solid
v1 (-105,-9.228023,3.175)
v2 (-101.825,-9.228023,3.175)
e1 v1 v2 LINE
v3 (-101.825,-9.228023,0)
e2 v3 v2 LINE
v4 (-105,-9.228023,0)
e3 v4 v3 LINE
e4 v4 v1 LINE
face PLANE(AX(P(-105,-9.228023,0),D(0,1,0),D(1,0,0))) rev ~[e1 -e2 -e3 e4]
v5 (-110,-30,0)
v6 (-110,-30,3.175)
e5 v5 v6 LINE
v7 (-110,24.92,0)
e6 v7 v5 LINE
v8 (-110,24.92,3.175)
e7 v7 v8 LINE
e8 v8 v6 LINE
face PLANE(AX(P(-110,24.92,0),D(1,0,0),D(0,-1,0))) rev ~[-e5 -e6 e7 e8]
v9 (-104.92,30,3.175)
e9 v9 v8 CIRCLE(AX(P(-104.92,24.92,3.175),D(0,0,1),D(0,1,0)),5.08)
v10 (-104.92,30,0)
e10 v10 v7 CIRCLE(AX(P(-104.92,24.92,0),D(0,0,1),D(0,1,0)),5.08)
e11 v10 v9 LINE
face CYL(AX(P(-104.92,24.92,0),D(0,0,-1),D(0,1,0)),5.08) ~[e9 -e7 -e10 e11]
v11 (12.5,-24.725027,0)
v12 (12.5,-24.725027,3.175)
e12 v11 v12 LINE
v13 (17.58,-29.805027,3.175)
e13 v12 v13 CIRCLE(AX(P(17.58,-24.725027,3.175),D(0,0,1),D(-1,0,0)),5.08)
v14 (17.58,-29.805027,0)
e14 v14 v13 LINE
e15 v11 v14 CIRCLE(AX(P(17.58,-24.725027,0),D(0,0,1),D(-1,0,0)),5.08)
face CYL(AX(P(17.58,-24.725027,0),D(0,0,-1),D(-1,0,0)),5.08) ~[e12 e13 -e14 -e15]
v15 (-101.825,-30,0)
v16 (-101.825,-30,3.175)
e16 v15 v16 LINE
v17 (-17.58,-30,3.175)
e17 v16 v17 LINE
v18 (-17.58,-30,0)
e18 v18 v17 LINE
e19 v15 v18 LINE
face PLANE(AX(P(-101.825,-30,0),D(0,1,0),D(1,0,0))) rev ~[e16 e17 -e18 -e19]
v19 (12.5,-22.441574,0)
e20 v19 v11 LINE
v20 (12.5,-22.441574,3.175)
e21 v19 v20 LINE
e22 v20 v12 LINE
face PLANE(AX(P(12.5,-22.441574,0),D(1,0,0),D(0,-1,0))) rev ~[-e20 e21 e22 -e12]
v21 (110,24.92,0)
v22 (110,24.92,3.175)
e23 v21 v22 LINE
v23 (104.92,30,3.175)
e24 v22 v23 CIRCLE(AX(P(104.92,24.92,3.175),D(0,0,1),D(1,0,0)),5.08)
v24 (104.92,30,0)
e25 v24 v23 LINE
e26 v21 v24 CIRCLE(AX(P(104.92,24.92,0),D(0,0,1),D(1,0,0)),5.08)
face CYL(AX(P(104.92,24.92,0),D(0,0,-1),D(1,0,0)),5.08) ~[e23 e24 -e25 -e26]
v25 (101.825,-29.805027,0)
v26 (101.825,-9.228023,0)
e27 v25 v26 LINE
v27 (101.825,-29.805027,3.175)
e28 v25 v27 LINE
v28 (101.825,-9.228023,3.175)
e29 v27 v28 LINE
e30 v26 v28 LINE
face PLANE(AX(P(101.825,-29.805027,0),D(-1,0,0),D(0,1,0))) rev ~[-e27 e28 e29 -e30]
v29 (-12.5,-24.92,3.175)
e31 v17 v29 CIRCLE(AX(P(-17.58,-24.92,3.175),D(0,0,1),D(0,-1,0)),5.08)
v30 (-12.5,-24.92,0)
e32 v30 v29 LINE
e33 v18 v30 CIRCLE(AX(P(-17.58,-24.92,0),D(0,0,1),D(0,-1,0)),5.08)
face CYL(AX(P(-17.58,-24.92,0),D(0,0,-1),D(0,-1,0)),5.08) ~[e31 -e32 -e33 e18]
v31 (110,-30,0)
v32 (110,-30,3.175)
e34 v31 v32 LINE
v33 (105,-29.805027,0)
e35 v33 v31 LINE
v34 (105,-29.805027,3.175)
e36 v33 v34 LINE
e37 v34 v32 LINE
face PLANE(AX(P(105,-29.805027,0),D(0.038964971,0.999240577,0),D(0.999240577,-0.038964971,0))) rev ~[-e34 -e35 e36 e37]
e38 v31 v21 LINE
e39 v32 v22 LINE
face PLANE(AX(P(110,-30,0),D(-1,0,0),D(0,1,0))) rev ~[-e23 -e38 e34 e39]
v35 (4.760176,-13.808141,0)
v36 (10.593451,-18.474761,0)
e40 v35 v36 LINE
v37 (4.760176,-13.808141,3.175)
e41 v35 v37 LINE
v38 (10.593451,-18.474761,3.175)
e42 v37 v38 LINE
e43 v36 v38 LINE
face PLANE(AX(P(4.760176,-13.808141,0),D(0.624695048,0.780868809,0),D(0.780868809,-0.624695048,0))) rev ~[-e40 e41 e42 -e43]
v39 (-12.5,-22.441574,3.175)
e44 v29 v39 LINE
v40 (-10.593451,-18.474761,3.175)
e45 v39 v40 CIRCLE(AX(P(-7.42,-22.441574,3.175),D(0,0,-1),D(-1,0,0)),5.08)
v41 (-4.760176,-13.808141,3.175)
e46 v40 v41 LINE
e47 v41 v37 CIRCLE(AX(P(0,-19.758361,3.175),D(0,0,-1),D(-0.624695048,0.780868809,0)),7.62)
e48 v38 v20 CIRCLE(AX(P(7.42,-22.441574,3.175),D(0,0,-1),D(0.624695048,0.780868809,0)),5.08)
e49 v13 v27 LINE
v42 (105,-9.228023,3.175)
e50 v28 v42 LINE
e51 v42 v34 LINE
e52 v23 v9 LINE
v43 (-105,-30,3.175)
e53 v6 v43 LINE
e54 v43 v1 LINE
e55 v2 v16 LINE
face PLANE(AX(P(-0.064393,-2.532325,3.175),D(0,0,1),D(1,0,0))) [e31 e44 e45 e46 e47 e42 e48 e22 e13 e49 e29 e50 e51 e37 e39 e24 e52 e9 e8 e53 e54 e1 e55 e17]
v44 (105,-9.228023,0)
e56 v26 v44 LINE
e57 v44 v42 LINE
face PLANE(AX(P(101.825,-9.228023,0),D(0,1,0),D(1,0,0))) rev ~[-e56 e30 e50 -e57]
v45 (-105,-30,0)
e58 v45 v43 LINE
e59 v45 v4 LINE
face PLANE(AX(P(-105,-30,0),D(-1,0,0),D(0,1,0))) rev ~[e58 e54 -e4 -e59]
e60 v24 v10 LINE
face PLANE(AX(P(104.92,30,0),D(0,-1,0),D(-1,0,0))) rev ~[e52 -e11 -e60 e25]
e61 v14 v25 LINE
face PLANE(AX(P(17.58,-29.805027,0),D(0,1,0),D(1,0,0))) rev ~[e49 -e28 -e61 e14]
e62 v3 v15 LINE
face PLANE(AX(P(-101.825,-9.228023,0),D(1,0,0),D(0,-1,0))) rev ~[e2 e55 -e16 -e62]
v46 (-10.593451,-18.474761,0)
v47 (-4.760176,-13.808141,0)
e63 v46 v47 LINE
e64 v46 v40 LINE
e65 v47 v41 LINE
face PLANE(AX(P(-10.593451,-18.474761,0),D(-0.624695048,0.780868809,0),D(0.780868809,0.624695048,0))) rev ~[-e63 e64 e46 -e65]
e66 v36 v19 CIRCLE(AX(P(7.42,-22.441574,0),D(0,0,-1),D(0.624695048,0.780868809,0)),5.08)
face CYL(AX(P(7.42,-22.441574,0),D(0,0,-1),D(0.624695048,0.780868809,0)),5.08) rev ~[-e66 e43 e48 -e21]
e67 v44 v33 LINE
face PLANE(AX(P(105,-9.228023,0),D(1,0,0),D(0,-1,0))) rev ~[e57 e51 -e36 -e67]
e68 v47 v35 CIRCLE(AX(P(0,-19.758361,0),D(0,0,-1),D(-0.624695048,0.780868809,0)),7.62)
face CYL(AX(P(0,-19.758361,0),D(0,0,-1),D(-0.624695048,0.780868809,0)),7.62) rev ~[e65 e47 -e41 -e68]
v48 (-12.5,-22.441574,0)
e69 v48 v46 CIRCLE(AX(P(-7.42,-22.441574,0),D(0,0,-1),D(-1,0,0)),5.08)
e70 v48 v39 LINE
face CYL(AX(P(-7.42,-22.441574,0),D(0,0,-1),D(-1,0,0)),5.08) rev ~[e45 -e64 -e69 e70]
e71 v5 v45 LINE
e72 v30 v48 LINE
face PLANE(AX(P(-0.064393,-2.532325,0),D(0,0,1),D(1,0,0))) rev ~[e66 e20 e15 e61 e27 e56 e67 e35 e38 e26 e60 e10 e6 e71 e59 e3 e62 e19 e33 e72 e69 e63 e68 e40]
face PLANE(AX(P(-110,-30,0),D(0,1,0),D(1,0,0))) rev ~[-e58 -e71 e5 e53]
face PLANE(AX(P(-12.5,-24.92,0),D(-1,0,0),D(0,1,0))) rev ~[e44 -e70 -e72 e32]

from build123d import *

# Parameters (mm, degrees)
F1_DEPTH = 3.175


# Not quite as in the source:
# - a length typed as a fraction of an inch, garbled in the dataset ("3 / 203.2 mm" for 3/8 in), is restored


with BuildPart() as f1:
    # F0 (on Top) → F1 (new body)
    with BuildSketch(Plane.XY):
        with BuildLine():
            ThreePointArc((110, 24.92), (108.5121024484, 28.5121024484), (104.92, 30))
            Line((104.92, 30), (-104.92, 30))
            ThreePointArc((-104.92, 30), (-108.5121024484, 28.5121024484), (-110, 24.92))
            Line((-110, 24.92), (-110, -30))
            Line((-110, -30), (-105, -30))
            Line((-105, -30), (-105, -9.2280227691))
            Line((-105, -9.2280227691), (-101.825, -9.2280227691))
            Line((-101.825, -9.2280227691), (-101.825, -30))
            Line((-101.825, -30), (-17.58, -30))
            ThreePointArc((-17.58, -30), (-13.9878975516, -28.5121024484), (-12.5, -24.92))
            Line((-12.5, -24.92), (-12.5, -22.4415742252))
            ThreePointArc((-12.5, -22.4415742252), (-11.9986204404, -20.2409754743), (-10.5934508416, -18.4747606733))
            Line((-10.5934508416, -18.4747606733), (-4.7601762624, -13.8081410099))
            ThreePointArc((-4.7601762624, -13.8081410099), (0, -12.1383613378), (4.7601762624, -13.8081410099))
            Line((4.7601762624, -13.8081410099), (10.5934508416, -18.4747606733))
            ThreePointArc((10.5934508416, -18.4747606733), (11.9986204404, -20.2409754743), (12.5, -22.4415742252))
            Line((12.5, -22.4415742252), (12.5, -24.7250270788))
            ThreePointArc((12.5, -24.7250270788), (13.9878975516, -28.3171295272), (17.58, -29.8050270788))
            Line((17.58, -29.8050270788), (101.825, -29.8050270788))
            Line((101.825, -29.8050270788), (101.825, -9.2280227691))
            Line((101.825, -9.2280227691), (105, -9.2280227691))
            Line((105, -9.2280227691), (105, -29.8050270788))
            Line((105, -29.8050270788), (110, -30))
            Line((110, -30), (110, 24.92))
        make_face()
    extrude(amount=F1_DEPTH)


solid = f1.part
